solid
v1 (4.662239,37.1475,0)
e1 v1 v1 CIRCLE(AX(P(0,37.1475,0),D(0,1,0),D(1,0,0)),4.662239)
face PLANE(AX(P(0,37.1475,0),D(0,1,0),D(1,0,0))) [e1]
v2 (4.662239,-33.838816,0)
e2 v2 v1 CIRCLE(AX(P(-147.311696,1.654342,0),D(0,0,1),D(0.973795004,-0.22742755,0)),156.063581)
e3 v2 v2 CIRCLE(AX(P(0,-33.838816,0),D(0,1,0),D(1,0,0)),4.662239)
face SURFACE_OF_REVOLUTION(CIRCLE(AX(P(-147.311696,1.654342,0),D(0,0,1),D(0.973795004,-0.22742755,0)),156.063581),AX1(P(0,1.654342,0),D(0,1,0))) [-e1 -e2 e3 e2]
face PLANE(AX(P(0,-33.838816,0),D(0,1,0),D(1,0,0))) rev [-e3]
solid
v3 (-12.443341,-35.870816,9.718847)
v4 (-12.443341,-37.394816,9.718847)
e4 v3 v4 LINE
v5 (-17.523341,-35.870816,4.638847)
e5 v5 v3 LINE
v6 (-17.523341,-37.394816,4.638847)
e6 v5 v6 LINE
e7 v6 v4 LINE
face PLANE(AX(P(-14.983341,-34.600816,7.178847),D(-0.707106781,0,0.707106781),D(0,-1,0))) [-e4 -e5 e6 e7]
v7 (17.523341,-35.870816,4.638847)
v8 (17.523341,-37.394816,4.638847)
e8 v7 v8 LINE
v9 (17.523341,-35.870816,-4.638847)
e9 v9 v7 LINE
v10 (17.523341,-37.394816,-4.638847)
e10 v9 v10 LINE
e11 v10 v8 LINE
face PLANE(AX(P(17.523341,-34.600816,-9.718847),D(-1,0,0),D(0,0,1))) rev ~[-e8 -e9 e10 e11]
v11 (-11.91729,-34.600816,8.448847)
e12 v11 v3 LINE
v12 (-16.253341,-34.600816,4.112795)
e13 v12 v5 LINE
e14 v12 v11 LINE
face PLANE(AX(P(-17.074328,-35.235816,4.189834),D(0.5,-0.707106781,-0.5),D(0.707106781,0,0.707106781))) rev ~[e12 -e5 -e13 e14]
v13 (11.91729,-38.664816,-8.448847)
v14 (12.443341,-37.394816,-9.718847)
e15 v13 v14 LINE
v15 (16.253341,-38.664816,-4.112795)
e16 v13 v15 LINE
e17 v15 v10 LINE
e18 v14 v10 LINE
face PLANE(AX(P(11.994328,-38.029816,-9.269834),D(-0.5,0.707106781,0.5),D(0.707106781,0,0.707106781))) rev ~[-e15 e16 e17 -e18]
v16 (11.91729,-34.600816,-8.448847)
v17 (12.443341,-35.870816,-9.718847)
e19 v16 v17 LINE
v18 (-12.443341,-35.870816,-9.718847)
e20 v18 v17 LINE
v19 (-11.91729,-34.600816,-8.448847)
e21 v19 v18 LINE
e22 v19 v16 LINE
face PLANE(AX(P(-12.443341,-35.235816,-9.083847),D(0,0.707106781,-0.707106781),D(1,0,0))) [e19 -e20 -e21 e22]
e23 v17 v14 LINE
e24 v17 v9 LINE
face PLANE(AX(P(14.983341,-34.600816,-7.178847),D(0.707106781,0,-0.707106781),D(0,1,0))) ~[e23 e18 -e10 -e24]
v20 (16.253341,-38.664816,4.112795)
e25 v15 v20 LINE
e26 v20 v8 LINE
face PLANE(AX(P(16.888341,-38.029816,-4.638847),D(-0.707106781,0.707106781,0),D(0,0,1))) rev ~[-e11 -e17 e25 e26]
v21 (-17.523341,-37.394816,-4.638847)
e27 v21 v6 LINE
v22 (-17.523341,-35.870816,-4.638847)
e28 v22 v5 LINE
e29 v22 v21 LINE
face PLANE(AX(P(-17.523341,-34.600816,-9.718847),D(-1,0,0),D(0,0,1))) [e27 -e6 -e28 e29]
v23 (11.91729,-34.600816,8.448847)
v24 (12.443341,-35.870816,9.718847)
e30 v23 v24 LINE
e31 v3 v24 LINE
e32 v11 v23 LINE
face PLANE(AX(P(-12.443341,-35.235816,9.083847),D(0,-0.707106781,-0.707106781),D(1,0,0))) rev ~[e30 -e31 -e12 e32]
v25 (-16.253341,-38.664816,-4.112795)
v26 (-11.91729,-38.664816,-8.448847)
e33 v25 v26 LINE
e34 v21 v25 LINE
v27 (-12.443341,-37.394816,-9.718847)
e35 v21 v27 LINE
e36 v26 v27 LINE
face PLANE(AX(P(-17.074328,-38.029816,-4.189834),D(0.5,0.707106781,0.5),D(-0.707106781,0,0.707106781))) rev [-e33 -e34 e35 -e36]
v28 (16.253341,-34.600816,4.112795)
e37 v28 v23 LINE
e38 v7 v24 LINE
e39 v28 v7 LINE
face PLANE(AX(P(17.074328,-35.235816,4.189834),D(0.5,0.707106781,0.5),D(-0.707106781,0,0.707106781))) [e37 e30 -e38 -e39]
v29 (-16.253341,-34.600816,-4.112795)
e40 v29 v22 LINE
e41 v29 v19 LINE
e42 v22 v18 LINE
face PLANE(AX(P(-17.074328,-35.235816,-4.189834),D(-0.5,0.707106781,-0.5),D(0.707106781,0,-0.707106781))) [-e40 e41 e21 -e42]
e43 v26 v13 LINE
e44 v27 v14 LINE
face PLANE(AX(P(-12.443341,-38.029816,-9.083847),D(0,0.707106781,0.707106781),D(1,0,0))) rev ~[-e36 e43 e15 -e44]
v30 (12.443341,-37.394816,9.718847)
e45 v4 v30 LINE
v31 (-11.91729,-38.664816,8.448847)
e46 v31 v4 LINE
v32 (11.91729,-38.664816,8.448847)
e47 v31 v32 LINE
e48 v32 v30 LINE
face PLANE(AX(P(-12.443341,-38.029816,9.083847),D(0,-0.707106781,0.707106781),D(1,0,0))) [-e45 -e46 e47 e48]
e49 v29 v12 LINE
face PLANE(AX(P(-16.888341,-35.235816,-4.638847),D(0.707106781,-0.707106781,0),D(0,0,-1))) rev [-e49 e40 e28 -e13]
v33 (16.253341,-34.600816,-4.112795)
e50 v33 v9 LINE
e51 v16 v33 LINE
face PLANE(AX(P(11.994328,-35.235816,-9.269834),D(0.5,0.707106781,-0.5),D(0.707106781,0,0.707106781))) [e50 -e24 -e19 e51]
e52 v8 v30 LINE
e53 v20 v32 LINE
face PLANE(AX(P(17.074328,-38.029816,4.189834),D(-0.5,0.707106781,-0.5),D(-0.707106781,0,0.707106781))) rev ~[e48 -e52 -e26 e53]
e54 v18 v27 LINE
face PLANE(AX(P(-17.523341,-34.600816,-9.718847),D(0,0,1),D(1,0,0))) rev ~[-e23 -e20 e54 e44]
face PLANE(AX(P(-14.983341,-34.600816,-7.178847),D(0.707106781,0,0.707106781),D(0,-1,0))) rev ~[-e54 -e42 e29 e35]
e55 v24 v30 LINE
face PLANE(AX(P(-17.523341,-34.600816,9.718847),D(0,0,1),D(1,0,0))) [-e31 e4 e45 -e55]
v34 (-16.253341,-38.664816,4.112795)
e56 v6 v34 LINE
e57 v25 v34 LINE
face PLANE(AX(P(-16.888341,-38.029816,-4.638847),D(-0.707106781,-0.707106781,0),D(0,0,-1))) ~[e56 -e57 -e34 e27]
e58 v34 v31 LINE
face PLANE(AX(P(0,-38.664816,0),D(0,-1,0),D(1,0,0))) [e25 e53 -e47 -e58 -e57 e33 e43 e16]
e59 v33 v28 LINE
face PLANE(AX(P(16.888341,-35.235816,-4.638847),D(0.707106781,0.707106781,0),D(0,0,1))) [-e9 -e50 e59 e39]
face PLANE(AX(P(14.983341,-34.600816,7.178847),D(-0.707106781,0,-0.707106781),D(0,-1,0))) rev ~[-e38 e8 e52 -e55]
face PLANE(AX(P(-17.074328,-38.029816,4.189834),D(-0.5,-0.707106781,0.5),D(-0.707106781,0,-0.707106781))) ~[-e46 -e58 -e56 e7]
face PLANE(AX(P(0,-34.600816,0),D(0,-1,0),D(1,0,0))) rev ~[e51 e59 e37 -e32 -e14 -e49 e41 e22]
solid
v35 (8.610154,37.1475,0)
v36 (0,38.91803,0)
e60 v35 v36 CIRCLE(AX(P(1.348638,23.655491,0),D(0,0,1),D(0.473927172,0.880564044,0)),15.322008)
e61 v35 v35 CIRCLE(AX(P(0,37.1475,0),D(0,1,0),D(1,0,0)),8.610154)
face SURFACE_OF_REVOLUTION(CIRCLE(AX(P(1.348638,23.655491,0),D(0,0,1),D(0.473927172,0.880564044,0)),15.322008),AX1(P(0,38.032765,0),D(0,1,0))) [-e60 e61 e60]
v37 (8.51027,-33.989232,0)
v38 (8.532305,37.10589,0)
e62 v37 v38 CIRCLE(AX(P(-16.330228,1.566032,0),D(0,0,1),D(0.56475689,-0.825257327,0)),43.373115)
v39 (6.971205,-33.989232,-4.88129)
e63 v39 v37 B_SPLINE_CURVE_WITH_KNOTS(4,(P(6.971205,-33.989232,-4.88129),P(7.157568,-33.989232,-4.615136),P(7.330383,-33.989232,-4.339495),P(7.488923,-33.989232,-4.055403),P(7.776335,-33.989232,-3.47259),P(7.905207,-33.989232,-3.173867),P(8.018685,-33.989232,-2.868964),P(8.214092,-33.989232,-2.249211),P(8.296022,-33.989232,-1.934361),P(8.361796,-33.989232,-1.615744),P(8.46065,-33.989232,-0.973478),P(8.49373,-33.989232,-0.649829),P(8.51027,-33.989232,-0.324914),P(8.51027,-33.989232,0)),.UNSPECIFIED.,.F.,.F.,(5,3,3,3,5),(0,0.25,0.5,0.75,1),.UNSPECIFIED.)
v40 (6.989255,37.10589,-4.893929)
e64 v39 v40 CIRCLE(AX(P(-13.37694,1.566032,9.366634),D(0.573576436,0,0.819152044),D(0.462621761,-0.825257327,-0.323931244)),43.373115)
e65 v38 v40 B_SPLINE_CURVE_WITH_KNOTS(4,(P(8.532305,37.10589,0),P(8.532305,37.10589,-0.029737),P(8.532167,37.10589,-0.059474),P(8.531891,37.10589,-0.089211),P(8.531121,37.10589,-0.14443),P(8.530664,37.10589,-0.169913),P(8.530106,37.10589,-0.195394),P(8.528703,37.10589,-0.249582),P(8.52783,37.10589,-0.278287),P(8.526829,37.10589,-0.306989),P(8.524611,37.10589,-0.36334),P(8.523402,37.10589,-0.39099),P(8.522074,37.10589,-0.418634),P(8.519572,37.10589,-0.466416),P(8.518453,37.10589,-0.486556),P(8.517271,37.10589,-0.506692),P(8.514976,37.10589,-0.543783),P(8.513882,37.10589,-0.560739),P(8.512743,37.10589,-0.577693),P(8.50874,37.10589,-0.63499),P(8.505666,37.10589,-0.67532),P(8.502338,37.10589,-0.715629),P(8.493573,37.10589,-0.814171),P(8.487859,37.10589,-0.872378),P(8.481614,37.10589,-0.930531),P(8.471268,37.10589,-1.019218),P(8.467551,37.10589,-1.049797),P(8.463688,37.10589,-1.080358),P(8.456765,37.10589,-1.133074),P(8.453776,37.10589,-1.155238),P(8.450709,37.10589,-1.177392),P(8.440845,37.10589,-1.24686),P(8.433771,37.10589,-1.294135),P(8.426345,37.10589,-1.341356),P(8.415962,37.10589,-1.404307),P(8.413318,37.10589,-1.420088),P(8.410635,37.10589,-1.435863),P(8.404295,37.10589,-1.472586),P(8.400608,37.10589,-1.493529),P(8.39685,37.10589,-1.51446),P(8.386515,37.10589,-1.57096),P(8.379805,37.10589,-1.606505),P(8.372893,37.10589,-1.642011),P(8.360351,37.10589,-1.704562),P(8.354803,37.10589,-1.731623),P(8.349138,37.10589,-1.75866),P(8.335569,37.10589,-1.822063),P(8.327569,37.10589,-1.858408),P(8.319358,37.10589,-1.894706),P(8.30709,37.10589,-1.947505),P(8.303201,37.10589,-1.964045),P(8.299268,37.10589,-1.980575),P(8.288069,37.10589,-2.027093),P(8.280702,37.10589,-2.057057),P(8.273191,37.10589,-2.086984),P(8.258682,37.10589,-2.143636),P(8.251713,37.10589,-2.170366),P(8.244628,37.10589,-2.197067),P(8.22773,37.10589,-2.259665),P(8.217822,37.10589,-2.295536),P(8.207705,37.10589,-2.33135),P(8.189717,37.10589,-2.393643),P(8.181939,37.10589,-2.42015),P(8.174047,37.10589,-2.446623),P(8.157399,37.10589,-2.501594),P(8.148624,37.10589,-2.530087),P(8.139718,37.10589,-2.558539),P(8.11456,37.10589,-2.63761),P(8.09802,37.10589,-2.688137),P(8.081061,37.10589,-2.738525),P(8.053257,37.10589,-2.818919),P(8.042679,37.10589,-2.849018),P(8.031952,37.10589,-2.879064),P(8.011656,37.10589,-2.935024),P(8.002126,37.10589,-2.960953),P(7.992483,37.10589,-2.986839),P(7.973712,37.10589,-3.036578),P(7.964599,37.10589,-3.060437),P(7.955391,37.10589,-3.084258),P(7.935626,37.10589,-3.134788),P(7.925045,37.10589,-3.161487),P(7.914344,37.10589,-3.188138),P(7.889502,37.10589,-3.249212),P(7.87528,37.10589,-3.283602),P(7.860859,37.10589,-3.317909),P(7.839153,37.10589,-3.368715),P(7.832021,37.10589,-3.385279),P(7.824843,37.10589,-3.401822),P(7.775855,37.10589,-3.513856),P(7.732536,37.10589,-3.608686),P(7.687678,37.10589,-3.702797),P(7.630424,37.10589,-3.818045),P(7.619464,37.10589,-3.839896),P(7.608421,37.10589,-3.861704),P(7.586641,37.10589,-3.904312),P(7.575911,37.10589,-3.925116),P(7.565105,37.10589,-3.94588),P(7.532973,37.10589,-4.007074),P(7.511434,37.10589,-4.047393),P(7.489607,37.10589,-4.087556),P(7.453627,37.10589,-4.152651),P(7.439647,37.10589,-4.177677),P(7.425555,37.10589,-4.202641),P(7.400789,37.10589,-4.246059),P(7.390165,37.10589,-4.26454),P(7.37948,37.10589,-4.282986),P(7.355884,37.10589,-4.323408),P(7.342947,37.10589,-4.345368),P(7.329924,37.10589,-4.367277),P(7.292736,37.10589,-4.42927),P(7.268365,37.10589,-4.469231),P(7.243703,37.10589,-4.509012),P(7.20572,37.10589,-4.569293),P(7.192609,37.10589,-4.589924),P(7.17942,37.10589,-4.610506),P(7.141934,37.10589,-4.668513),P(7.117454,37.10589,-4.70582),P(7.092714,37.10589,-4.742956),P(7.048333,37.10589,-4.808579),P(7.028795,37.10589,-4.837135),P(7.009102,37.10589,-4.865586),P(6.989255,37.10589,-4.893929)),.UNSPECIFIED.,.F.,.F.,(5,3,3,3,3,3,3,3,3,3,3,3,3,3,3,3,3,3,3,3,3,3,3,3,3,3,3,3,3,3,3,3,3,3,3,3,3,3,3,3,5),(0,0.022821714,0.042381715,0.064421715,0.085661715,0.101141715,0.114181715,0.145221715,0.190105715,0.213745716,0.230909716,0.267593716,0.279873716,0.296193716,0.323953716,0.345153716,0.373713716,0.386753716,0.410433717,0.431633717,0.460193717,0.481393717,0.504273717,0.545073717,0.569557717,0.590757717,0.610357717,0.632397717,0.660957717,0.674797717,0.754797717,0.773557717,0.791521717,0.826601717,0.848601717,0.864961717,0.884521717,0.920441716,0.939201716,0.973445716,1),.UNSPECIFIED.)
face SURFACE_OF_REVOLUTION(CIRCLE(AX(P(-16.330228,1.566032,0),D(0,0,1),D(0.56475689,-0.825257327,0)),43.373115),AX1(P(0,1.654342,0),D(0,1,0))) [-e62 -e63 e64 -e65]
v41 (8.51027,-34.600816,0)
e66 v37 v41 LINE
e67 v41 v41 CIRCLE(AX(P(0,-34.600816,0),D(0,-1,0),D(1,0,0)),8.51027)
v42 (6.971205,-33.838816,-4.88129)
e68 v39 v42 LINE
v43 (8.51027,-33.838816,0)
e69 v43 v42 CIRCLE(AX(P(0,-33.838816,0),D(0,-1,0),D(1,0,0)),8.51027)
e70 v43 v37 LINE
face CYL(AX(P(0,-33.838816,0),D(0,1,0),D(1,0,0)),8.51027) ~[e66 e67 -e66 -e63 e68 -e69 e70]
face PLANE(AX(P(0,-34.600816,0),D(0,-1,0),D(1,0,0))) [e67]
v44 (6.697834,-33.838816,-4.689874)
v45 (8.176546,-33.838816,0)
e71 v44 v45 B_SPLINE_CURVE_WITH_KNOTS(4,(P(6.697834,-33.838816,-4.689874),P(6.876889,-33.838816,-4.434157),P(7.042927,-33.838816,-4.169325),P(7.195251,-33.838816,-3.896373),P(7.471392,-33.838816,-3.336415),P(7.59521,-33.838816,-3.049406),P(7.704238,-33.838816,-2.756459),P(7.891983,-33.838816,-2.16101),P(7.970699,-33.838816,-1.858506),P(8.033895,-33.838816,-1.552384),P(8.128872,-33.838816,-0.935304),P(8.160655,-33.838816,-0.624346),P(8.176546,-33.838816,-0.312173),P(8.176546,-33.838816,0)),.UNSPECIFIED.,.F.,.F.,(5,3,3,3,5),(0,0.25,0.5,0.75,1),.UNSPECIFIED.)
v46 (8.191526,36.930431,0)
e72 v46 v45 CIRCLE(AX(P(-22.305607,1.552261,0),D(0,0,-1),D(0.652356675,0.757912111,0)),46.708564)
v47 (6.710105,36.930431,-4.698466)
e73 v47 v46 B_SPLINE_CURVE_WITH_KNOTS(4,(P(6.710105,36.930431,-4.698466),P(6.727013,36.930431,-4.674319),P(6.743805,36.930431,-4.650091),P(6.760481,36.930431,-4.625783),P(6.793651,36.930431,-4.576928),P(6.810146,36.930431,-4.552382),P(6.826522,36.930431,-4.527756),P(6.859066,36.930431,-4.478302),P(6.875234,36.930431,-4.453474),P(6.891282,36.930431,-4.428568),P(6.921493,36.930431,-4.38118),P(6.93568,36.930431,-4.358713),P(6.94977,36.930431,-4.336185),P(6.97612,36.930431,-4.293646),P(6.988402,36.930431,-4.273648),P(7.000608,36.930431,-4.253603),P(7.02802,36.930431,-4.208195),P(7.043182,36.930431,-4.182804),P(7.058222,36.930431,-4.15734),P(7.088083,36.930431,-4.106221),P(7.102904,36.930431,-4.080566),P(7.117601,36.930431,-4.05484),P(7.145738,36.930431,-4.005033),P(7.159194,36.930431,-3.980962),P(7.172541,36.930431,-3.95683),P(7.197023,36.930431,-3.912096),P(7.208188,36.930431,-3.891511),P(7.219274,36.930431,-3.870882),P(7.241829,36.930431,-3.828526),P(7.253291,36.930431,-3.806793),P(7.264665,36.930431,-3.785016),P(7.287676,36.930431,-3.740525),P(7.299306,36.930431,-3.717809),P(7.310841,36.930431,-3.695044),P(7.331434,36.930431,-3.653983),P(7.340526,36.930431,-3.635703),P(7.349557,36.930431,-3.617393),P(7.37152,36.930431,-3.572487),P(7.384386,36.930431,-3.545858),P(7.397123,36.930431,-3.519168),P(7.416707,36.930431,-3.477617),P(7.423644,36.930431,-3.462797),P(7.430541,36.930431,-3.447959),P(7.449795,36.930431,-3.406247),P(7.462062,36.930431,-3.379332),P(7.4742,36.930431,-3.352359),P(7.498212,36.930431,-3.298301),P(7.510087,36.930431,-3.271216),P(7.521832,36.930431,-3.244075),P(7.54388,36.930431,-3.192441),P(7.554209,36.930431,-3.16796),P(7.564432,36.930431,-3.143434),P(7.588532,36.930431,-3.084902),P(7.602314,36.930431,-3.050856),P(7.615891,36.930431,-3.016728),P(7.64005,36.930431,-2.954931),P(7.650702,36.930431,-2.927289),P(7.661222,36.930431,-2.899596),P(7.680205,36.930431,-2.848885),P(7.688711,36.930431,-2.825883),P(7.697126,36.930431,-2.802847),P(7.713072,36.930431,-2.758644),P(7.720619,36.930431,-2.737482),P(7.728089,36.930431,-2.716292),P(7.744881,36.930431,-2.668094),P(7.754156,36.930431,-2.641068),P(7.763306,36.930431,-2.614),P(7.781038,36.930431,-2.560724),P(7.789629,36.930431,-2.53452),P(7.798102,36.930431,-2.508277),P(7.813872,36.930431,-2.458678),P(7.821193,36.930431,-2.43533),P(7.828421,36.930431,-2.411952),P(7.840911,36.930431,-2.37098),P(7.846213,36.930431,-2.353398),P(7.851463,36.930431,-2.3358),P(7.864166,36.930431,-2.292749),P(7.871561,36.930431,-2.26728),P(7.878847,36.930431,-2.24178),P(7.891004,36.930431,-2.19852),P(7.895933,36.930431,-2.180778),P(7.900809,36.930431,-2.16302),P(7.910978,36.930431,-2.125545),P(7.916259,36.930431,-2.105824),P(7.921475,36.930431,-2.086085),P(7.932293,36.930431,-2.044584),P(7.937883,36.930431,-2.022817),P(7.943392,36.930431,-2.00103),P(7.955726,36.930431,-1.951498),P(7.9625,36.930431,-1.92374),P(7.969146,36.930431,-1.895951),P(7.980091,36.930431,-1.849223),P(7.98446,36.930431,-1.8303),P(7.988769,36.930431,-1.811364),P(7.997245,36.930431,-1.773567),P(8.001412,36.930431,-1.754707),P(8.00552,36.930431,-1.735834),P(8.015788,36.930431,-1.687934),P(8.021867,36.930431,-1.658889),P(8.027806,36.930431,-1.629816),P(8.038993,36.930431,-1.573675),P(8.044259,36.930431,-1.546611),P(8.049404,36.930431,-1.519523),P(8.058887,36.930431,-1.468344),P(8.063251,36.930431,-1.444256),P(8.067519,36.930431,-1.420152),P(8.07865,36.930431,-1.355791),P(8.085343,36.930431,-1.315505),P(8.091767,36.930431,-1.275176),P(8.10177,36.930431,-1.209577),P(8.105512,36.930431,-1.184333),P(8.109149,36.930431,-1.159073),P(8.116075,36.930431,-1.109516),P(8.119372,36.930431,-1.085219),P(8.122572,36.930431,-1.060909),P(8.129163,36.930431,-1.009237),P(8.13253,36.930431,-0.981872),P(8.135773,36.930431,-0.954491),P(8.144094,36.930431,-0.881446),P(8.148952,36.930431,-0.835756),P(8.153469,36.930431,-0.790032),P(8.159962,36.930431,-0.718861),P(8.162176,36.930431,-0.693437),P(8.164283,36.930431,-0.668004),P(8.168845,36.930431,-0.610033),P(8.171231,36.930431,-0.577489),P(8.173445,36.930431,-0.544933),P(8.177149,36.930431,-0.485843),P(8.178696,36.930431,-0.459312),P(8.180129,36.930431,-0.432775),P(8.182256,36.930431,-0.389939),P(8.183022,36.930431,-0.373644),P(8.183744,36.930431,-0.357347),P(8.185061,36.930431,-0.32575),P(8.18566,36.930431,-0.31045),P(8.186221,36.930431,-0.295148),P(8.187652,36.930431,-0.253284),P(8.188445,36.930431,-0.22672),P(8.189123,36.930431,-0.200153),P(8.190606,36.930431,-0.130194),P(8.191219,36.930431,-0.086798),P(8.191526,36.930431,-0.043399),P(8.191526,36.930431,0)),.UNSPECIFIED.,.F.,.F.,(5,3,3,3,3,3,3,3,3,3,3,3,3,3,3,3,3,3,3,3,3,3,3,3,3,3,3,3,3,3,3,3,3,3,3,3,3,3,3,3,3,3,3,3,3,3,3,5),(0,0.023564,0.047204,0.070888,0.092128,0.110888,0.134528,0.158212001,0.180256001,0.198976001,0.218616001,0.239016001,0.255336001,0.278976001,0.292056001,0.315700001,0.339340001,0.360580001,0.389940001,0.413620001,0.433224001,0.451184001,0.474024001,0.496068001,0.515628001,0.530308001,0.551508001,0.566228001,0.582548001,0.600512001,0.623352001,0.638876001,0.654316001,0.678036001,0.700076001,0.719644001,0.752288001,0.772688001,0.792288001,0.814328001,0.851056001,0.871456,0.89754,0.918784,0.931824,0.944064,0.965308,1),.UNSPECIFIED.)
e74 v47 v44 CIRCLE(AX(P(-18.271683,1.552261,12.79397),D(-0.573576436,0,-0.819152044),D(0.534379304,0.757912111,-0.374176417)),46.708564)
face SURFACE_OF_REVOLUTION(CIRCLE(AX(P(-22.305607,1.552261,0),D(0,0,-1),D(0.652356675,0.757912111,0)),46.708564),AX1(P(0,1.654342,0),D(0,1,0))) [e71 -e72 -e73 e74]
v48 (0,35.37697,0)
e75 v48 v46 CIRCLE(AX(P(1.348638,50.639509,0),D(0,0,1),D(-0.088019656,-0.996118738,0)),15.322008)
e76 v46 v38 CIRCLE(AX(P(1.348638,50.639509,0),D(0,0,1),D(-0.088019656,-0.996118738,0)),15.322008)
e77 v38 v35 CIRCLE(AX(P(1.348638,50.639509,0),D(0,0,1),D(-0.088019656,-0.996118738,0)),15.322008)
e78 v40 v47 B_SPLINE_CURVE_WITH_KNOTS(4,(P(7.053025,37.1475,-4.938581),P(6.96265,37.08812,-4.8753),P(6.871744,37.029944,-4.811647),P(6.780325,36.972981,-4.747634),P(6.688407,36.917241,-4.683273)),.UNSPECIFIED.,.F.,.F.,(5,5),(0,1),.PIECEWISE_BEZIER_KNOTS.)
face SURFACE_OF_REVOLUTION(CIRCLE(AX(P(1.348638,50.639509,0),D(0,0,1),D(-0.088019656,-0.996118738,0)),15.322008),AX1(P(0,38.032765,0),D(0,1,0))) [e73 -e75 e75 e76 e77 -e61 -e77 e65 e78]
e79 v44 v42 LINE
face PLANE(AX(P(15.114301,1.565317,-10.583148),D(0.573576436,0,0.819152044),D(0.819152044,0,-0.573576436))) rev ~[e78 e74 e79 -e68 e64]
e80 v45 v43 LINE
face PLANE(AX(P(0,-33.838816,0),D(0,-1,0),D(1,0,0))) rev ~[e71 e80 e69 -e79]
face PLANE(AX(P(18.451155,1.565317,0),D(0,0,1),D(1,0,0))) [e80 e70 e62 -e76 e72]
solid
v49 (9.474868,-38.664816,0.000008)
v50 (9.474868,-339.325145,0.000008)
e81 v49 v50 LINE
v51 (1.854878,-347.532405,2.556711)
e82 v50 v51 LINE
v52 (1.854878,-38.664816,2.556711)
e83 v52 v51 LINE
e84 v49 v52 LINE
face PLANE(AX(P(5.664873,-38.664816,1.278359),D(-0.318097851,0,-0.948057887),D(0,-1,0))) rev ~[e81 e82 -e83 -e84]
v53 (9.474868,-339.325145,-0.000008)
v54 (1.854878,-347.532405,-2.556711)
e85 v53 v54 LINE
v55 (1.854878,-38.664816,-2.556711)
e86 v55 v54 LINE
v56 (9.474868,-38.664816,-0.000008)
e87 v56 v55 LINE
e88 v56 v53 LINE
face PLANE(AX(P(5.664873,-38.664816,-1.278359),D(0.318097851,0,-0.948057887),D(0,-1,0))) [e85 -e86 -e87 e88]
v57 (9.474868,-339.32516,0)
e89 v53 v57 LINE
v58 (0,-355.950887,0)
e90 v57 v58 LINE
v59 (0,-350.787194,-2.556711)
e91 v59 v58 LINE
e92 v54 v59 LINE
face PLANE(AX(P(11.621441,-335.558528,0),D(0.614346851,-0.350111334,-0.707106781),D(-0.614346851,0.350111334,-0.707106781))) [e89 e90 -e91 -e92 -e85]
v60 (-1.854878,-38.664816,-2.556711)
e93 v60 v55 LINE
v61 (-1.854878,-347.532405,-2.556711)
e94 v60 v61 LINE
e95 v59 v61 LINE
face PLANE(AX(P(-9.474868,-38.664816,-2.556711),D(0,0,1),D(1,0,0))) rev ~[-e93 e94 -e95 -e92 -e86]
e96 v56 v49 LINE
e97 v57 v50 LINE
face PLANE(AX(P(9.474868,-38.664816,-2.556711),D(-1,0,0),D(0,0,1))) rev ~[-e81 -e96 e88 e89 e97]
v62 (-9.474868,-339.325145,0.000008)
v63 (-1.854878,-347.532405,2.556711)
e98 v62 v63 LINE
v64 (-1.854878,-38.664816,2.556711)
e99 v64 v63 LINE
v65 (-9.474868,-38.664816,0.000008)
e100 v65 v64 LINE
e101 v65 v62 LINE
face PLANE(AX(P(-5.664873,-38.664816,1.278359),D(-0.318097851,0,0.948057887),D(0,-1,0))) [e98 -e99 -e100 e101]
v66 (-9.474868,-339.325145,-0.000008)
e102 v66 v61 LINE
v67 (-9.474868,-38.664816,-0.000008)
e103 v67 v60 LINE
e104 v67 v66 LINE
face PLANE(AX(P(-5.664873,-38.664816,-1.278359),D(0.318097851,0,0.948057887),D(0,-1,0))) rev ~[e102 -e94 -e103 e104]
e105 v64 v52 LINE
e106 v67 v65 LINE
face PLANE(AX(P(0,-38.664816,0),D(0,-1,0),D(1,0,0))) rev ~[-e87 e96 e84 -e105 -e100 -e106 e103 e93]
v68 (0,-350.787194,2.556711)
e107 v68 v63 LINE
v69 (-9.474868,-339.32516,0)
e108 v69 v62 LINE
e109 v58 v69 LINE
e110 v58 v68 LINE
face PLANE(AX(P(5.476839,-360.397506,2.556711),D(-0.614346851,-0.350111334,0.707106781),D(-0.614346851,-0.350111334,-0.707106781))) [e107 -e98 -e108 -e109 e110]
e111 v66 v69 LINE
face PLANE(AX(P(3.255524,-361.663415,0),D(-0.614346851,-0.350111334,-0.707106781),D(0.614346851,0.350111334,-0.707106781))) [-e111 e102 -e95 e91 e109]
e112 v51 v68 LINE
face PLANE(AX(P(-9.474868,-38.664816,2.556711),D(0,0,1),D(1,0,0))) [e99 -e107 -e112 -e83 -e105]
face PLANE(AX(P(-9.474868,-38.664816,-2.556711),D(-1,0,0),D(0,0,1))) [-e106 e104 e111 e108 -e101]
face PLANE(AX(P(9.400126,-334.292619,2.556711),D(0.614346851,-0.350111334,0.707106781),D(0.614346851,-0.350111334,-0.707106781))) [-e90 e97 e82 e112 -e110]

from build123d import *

# Parameters (mm, degrees)
F5_ANGLE     = 35
F6_R         = 8.5102699217
F6_R_2       = 4.6622389928
F7_DEPTH     = 0.762
F8_W         = 35.0466817617
F8_H         = 19.4376930594
F8_R         = 8.5102699217
F9_DEPTH     = 4.064
F10_SIZE     = 5.08
F11_SIZE     = 1.27
F12_W        = 18.9497359097
F12_H        = 5.1134214737
F13_DEPTH    = 320.04
F14_SIZE2    = 7.61999
F14_SIZE     = 2.556703
F14_2_SIZE2  = 7.61999
F14_2_SIZE   = 2.556703
F16_DEPTH    = 25.4
F17_T1_DEPTH = 30.0464510696
F17_T3_DEPTH = 30.0464510696


# Not quite as in the source:
# - a fillet or chamfer that OpenCascade refuses, or shapes differently, is made with other operations: its cross-section is extruded or revolved along the edge and cut away or added
# - a fillet or chamfer is up to 0.001 mm smaller than in the source, because OpenCascade refuses the exact size


with BuildPart() as f1:
    # F0 (on Top) → F1 (revolve)
    with BuildSketch(Plane.XY):
        with BuildLine():
            Line((0, 37.1474996209), (0, -33.8388159871))
            Line((0, -33.8388159871), (4.6622389928, -33.8388159871))
            ThreePointArc((4.6622389928, -33.8388159871), (8.7518845263, 1.6543418169), (4.6622389928, 37.1474996209))
            Line((4.6622389928, 37.1474996209), (0, 37.1474996209))
        make_face()
    revolve(axis=Axis((0, 1.6543418169, 0), (0, 1, 0)))


with BuildPart() as f3:
    # F2 (on Top) → F3 (revolve)
    with BuildSketch(Plane.XY):
        with BuildLine():
            Line((0, 38.9180295169), (0, 37.1474996209))
            Line((0, 37.1474996209), (0, 35.3769697249))
            ThreePointArc((0, 35.3769697249), (4.4347721966, 35.6315210034), (8.6101535708, 37.1474996209))
            ThreePointArc((8.6101535708, 37.1474996209), (4.4347721966, 38.6634782385), (0, 38.9180295169))
        make_face()
    revolve(axis=Axis((0, 38.0327645689, 0), (0, 1, 0)))

    # F4 (on Top) → F5 (revolve)
    with BuildSketch(Plane.XY):
        with BuildLine():
            Line((8.1650372595, 37.3600125313), (8.1650372595, 37.2307524085))
            Line((8.1650372595, 37.2307524085), (8.1650372595, 36.9532480836))
            ThreePointArc((8.1650372595, 36.9532480836), (24.4029578966, 1.5522614121), (8.1650372595, -33.8487252593))
            Line((8.1650372595, -33.8487252593), (8.1650372595, -34.227949133))
            ThreePointArc((8.1650372595, -34.227949133), (27.04288668, 1.5660316991), (8.1650372595, 37.3600125313))
        make_face()
    revolve(axis=Axis((0, 1.6543418169, 0), (0, 1, 0)), revolution_arc=F5_ANGLE)

    # F6 (on face) → F7 (join)
    with BuildSketch(Plane.XZ.offset(33.8388159871)):
        Circle(F6_R)
        Circle(F6_R_2, mode=Mode.SUBTRACT)
        Circle(F6_R_2)
    extrude(amount=F7_DEPTH)


with BuildPart() as f9:
    # F8 (on face) → F9 (new body)
    with BuildSketch(Plane.XZ.offset(34.6008159871)):
        Rectangle(F8_W, F8_H)
        Circle(F8_R, mode=Mode.SUBTRACT)
        Circle(F8_R)
    extrude(amount=F9_DEPTH)

    # F10
    f10_edges = [f9.edges().sort_by_distance(p)[0] for p in [
        (-17.523341, -36.632816, 9.718847),
        (-17.523341, -36.632816, -9.718847),
        (17.523341, -36.632816, 9.718847),
        (17.523341, -36.632816, -9.718847),
    ]]
    chamfer(f10_edges, length=F10_SIZE)

    # F11
    f11_edges = [f9.edges().sort_by_distance(p)[0] for p in [
        (17.523341, -38.664816, 0),
        (14.983341, -38.664816, -7.178847),
        (14.983341, -38.664816, 7.178847),
        (0, -38.664816, -9.718847),
        (0, -38.664816, 9.718847),
        (-14.983341, -38.664816, -7.178847),
        (-14.983341, -38.664816, 7.178847),
        (-17.523341, -38.664816, 0),
        (17.523341, -34.600816, 0),
        (14.983341, -34.600816, -7.178847),
        (14.983341, -34.600816, 7.178847),
        (0, -34.600816, -9.718847),
        (0, -34.600816, 9.718847),
        (-14.983341, -34.600816, -7.178847),
        (-14.983341, -34.600816, 7.178847),
        (-17.523341, -34.600816, 0),
    ]]
    chamfer(f11_edges, length=F11_SIZE)


with BuildPart() as f13:
    # F12 (on face) → F13 (new body)
    with BuildSketch(Plane.XZ.offset(38.6648159871)):
        Rectangle(F12_W, F12_H)
    extrude(amount=F13_DEPTH)

    # F14 (size 2.5567132 and 7.62 in the source; OpenCascade refuses exactly that, so slightly less here)
    f14_edges = [f13.edges().sort_by_distance(p)[0] for p in [
        (-9.474868, -198.684816, 2.556711),
        (-9.474868, -198.684816, -2.556711),
    ]]
    f14_side = f13.faces().sort_by_distance((-9.474868, -198.684816, 0))[0]
    chamfer(f14_edges, length=F14_SIZE, length2=F14_SIZE2, reference=f14_side)

    # F14#2 (size 2.5567132 and 7.62 in the source; OpenCascade refuses exactly that, so slightly less here)
    f14_2_edges = [f13.edges().sort_by_distance(p)[0] for p in [
        (9.474868, -198.684816, 2.556711),
        (9.474868, -198.684816, -2.556711),
    ]]
    f14_2_side = f13.faces().sort_by_distance((9.474868, -198.684816, 0))[0]
    chamfer(f14_2_edges, length=F14_2_SIZE, length2=F14_2_SIZE2, reference=f14_2_side)

    # F15 (on face) → F16 (cut)
    with BuildSketch(Plane.XY.offset(2.5567107368)):
        Polygon((11.3733373582, -335.993885994), (1.8548779549, -352.6961032261), (1.8548779549, -358.7048159871), (-1.8548779549, -358.7048159871), (-1.8548779549, -352.6961032261), (-11.3733373582, -335.993885994), (-10.944146663, -359.4379723072), (13.7874875218, -359.4379723072), align=None)
        Polygon((1.8548779549, -352.6961032261), (0, -355.9508919716), (-1.8548779549, -352.6961032261), (-1.8548779549, -358.7048159871), (1.8548779549, -358.7048159871), align=None)
    extrude(amount=-F16_DEPTH, mode=Mode.SUBTRACT)

    # F17: chamfer of 2.5567132 on 4 edges, made by hand

    # F17_s2 → F17_t1 (cut)
    with BuildSketch(Plane(origin=(156.378331212, -274.399957767, 0), x_dir=(0, 0, 1), z_dir=(-0.4951321974, 0.8688176489, 0))):
        Polygon((2.5567107368, -173.6860341202), (-2.4632e-06, -176.2427473202), (2.5567107368, -176.2427473202), align=None)
        Polygon((2.4632e-06, -176.2427473202), (-2.5567107368, -173.6860341202), (-2.5567107368, -176.2427473202), align=None)
    extrude(amount=F17_T1_DEPTH, mode=Mode.SUBTRACT)

    # F17_s4 → F17_t3 (cut)
    with BuildSketch(Plane(origin=(-141.5013658689, -248.2950707905, 0), x_dir=(0, 0, 1), z_dir=(-0.4951321974, -0.8688176489, 0))):
        Polygon((2.5567107368, -173.6860341202), (-2.4632e-06, -176.2427473202), (2.5567107368, -176.2427473202), align=None)
        Polygon((2.4632e-06, -176.2427473202), (-2.5567107368, -173.6860341202), (-2.5567107368, -176.2427473202), align=None)
    extrude(amount=F17_T3_DEPTH, mode=Mode.SUBTRACT)


solid = Compound([f1.part, f3.part, f9.part, f13.part])
